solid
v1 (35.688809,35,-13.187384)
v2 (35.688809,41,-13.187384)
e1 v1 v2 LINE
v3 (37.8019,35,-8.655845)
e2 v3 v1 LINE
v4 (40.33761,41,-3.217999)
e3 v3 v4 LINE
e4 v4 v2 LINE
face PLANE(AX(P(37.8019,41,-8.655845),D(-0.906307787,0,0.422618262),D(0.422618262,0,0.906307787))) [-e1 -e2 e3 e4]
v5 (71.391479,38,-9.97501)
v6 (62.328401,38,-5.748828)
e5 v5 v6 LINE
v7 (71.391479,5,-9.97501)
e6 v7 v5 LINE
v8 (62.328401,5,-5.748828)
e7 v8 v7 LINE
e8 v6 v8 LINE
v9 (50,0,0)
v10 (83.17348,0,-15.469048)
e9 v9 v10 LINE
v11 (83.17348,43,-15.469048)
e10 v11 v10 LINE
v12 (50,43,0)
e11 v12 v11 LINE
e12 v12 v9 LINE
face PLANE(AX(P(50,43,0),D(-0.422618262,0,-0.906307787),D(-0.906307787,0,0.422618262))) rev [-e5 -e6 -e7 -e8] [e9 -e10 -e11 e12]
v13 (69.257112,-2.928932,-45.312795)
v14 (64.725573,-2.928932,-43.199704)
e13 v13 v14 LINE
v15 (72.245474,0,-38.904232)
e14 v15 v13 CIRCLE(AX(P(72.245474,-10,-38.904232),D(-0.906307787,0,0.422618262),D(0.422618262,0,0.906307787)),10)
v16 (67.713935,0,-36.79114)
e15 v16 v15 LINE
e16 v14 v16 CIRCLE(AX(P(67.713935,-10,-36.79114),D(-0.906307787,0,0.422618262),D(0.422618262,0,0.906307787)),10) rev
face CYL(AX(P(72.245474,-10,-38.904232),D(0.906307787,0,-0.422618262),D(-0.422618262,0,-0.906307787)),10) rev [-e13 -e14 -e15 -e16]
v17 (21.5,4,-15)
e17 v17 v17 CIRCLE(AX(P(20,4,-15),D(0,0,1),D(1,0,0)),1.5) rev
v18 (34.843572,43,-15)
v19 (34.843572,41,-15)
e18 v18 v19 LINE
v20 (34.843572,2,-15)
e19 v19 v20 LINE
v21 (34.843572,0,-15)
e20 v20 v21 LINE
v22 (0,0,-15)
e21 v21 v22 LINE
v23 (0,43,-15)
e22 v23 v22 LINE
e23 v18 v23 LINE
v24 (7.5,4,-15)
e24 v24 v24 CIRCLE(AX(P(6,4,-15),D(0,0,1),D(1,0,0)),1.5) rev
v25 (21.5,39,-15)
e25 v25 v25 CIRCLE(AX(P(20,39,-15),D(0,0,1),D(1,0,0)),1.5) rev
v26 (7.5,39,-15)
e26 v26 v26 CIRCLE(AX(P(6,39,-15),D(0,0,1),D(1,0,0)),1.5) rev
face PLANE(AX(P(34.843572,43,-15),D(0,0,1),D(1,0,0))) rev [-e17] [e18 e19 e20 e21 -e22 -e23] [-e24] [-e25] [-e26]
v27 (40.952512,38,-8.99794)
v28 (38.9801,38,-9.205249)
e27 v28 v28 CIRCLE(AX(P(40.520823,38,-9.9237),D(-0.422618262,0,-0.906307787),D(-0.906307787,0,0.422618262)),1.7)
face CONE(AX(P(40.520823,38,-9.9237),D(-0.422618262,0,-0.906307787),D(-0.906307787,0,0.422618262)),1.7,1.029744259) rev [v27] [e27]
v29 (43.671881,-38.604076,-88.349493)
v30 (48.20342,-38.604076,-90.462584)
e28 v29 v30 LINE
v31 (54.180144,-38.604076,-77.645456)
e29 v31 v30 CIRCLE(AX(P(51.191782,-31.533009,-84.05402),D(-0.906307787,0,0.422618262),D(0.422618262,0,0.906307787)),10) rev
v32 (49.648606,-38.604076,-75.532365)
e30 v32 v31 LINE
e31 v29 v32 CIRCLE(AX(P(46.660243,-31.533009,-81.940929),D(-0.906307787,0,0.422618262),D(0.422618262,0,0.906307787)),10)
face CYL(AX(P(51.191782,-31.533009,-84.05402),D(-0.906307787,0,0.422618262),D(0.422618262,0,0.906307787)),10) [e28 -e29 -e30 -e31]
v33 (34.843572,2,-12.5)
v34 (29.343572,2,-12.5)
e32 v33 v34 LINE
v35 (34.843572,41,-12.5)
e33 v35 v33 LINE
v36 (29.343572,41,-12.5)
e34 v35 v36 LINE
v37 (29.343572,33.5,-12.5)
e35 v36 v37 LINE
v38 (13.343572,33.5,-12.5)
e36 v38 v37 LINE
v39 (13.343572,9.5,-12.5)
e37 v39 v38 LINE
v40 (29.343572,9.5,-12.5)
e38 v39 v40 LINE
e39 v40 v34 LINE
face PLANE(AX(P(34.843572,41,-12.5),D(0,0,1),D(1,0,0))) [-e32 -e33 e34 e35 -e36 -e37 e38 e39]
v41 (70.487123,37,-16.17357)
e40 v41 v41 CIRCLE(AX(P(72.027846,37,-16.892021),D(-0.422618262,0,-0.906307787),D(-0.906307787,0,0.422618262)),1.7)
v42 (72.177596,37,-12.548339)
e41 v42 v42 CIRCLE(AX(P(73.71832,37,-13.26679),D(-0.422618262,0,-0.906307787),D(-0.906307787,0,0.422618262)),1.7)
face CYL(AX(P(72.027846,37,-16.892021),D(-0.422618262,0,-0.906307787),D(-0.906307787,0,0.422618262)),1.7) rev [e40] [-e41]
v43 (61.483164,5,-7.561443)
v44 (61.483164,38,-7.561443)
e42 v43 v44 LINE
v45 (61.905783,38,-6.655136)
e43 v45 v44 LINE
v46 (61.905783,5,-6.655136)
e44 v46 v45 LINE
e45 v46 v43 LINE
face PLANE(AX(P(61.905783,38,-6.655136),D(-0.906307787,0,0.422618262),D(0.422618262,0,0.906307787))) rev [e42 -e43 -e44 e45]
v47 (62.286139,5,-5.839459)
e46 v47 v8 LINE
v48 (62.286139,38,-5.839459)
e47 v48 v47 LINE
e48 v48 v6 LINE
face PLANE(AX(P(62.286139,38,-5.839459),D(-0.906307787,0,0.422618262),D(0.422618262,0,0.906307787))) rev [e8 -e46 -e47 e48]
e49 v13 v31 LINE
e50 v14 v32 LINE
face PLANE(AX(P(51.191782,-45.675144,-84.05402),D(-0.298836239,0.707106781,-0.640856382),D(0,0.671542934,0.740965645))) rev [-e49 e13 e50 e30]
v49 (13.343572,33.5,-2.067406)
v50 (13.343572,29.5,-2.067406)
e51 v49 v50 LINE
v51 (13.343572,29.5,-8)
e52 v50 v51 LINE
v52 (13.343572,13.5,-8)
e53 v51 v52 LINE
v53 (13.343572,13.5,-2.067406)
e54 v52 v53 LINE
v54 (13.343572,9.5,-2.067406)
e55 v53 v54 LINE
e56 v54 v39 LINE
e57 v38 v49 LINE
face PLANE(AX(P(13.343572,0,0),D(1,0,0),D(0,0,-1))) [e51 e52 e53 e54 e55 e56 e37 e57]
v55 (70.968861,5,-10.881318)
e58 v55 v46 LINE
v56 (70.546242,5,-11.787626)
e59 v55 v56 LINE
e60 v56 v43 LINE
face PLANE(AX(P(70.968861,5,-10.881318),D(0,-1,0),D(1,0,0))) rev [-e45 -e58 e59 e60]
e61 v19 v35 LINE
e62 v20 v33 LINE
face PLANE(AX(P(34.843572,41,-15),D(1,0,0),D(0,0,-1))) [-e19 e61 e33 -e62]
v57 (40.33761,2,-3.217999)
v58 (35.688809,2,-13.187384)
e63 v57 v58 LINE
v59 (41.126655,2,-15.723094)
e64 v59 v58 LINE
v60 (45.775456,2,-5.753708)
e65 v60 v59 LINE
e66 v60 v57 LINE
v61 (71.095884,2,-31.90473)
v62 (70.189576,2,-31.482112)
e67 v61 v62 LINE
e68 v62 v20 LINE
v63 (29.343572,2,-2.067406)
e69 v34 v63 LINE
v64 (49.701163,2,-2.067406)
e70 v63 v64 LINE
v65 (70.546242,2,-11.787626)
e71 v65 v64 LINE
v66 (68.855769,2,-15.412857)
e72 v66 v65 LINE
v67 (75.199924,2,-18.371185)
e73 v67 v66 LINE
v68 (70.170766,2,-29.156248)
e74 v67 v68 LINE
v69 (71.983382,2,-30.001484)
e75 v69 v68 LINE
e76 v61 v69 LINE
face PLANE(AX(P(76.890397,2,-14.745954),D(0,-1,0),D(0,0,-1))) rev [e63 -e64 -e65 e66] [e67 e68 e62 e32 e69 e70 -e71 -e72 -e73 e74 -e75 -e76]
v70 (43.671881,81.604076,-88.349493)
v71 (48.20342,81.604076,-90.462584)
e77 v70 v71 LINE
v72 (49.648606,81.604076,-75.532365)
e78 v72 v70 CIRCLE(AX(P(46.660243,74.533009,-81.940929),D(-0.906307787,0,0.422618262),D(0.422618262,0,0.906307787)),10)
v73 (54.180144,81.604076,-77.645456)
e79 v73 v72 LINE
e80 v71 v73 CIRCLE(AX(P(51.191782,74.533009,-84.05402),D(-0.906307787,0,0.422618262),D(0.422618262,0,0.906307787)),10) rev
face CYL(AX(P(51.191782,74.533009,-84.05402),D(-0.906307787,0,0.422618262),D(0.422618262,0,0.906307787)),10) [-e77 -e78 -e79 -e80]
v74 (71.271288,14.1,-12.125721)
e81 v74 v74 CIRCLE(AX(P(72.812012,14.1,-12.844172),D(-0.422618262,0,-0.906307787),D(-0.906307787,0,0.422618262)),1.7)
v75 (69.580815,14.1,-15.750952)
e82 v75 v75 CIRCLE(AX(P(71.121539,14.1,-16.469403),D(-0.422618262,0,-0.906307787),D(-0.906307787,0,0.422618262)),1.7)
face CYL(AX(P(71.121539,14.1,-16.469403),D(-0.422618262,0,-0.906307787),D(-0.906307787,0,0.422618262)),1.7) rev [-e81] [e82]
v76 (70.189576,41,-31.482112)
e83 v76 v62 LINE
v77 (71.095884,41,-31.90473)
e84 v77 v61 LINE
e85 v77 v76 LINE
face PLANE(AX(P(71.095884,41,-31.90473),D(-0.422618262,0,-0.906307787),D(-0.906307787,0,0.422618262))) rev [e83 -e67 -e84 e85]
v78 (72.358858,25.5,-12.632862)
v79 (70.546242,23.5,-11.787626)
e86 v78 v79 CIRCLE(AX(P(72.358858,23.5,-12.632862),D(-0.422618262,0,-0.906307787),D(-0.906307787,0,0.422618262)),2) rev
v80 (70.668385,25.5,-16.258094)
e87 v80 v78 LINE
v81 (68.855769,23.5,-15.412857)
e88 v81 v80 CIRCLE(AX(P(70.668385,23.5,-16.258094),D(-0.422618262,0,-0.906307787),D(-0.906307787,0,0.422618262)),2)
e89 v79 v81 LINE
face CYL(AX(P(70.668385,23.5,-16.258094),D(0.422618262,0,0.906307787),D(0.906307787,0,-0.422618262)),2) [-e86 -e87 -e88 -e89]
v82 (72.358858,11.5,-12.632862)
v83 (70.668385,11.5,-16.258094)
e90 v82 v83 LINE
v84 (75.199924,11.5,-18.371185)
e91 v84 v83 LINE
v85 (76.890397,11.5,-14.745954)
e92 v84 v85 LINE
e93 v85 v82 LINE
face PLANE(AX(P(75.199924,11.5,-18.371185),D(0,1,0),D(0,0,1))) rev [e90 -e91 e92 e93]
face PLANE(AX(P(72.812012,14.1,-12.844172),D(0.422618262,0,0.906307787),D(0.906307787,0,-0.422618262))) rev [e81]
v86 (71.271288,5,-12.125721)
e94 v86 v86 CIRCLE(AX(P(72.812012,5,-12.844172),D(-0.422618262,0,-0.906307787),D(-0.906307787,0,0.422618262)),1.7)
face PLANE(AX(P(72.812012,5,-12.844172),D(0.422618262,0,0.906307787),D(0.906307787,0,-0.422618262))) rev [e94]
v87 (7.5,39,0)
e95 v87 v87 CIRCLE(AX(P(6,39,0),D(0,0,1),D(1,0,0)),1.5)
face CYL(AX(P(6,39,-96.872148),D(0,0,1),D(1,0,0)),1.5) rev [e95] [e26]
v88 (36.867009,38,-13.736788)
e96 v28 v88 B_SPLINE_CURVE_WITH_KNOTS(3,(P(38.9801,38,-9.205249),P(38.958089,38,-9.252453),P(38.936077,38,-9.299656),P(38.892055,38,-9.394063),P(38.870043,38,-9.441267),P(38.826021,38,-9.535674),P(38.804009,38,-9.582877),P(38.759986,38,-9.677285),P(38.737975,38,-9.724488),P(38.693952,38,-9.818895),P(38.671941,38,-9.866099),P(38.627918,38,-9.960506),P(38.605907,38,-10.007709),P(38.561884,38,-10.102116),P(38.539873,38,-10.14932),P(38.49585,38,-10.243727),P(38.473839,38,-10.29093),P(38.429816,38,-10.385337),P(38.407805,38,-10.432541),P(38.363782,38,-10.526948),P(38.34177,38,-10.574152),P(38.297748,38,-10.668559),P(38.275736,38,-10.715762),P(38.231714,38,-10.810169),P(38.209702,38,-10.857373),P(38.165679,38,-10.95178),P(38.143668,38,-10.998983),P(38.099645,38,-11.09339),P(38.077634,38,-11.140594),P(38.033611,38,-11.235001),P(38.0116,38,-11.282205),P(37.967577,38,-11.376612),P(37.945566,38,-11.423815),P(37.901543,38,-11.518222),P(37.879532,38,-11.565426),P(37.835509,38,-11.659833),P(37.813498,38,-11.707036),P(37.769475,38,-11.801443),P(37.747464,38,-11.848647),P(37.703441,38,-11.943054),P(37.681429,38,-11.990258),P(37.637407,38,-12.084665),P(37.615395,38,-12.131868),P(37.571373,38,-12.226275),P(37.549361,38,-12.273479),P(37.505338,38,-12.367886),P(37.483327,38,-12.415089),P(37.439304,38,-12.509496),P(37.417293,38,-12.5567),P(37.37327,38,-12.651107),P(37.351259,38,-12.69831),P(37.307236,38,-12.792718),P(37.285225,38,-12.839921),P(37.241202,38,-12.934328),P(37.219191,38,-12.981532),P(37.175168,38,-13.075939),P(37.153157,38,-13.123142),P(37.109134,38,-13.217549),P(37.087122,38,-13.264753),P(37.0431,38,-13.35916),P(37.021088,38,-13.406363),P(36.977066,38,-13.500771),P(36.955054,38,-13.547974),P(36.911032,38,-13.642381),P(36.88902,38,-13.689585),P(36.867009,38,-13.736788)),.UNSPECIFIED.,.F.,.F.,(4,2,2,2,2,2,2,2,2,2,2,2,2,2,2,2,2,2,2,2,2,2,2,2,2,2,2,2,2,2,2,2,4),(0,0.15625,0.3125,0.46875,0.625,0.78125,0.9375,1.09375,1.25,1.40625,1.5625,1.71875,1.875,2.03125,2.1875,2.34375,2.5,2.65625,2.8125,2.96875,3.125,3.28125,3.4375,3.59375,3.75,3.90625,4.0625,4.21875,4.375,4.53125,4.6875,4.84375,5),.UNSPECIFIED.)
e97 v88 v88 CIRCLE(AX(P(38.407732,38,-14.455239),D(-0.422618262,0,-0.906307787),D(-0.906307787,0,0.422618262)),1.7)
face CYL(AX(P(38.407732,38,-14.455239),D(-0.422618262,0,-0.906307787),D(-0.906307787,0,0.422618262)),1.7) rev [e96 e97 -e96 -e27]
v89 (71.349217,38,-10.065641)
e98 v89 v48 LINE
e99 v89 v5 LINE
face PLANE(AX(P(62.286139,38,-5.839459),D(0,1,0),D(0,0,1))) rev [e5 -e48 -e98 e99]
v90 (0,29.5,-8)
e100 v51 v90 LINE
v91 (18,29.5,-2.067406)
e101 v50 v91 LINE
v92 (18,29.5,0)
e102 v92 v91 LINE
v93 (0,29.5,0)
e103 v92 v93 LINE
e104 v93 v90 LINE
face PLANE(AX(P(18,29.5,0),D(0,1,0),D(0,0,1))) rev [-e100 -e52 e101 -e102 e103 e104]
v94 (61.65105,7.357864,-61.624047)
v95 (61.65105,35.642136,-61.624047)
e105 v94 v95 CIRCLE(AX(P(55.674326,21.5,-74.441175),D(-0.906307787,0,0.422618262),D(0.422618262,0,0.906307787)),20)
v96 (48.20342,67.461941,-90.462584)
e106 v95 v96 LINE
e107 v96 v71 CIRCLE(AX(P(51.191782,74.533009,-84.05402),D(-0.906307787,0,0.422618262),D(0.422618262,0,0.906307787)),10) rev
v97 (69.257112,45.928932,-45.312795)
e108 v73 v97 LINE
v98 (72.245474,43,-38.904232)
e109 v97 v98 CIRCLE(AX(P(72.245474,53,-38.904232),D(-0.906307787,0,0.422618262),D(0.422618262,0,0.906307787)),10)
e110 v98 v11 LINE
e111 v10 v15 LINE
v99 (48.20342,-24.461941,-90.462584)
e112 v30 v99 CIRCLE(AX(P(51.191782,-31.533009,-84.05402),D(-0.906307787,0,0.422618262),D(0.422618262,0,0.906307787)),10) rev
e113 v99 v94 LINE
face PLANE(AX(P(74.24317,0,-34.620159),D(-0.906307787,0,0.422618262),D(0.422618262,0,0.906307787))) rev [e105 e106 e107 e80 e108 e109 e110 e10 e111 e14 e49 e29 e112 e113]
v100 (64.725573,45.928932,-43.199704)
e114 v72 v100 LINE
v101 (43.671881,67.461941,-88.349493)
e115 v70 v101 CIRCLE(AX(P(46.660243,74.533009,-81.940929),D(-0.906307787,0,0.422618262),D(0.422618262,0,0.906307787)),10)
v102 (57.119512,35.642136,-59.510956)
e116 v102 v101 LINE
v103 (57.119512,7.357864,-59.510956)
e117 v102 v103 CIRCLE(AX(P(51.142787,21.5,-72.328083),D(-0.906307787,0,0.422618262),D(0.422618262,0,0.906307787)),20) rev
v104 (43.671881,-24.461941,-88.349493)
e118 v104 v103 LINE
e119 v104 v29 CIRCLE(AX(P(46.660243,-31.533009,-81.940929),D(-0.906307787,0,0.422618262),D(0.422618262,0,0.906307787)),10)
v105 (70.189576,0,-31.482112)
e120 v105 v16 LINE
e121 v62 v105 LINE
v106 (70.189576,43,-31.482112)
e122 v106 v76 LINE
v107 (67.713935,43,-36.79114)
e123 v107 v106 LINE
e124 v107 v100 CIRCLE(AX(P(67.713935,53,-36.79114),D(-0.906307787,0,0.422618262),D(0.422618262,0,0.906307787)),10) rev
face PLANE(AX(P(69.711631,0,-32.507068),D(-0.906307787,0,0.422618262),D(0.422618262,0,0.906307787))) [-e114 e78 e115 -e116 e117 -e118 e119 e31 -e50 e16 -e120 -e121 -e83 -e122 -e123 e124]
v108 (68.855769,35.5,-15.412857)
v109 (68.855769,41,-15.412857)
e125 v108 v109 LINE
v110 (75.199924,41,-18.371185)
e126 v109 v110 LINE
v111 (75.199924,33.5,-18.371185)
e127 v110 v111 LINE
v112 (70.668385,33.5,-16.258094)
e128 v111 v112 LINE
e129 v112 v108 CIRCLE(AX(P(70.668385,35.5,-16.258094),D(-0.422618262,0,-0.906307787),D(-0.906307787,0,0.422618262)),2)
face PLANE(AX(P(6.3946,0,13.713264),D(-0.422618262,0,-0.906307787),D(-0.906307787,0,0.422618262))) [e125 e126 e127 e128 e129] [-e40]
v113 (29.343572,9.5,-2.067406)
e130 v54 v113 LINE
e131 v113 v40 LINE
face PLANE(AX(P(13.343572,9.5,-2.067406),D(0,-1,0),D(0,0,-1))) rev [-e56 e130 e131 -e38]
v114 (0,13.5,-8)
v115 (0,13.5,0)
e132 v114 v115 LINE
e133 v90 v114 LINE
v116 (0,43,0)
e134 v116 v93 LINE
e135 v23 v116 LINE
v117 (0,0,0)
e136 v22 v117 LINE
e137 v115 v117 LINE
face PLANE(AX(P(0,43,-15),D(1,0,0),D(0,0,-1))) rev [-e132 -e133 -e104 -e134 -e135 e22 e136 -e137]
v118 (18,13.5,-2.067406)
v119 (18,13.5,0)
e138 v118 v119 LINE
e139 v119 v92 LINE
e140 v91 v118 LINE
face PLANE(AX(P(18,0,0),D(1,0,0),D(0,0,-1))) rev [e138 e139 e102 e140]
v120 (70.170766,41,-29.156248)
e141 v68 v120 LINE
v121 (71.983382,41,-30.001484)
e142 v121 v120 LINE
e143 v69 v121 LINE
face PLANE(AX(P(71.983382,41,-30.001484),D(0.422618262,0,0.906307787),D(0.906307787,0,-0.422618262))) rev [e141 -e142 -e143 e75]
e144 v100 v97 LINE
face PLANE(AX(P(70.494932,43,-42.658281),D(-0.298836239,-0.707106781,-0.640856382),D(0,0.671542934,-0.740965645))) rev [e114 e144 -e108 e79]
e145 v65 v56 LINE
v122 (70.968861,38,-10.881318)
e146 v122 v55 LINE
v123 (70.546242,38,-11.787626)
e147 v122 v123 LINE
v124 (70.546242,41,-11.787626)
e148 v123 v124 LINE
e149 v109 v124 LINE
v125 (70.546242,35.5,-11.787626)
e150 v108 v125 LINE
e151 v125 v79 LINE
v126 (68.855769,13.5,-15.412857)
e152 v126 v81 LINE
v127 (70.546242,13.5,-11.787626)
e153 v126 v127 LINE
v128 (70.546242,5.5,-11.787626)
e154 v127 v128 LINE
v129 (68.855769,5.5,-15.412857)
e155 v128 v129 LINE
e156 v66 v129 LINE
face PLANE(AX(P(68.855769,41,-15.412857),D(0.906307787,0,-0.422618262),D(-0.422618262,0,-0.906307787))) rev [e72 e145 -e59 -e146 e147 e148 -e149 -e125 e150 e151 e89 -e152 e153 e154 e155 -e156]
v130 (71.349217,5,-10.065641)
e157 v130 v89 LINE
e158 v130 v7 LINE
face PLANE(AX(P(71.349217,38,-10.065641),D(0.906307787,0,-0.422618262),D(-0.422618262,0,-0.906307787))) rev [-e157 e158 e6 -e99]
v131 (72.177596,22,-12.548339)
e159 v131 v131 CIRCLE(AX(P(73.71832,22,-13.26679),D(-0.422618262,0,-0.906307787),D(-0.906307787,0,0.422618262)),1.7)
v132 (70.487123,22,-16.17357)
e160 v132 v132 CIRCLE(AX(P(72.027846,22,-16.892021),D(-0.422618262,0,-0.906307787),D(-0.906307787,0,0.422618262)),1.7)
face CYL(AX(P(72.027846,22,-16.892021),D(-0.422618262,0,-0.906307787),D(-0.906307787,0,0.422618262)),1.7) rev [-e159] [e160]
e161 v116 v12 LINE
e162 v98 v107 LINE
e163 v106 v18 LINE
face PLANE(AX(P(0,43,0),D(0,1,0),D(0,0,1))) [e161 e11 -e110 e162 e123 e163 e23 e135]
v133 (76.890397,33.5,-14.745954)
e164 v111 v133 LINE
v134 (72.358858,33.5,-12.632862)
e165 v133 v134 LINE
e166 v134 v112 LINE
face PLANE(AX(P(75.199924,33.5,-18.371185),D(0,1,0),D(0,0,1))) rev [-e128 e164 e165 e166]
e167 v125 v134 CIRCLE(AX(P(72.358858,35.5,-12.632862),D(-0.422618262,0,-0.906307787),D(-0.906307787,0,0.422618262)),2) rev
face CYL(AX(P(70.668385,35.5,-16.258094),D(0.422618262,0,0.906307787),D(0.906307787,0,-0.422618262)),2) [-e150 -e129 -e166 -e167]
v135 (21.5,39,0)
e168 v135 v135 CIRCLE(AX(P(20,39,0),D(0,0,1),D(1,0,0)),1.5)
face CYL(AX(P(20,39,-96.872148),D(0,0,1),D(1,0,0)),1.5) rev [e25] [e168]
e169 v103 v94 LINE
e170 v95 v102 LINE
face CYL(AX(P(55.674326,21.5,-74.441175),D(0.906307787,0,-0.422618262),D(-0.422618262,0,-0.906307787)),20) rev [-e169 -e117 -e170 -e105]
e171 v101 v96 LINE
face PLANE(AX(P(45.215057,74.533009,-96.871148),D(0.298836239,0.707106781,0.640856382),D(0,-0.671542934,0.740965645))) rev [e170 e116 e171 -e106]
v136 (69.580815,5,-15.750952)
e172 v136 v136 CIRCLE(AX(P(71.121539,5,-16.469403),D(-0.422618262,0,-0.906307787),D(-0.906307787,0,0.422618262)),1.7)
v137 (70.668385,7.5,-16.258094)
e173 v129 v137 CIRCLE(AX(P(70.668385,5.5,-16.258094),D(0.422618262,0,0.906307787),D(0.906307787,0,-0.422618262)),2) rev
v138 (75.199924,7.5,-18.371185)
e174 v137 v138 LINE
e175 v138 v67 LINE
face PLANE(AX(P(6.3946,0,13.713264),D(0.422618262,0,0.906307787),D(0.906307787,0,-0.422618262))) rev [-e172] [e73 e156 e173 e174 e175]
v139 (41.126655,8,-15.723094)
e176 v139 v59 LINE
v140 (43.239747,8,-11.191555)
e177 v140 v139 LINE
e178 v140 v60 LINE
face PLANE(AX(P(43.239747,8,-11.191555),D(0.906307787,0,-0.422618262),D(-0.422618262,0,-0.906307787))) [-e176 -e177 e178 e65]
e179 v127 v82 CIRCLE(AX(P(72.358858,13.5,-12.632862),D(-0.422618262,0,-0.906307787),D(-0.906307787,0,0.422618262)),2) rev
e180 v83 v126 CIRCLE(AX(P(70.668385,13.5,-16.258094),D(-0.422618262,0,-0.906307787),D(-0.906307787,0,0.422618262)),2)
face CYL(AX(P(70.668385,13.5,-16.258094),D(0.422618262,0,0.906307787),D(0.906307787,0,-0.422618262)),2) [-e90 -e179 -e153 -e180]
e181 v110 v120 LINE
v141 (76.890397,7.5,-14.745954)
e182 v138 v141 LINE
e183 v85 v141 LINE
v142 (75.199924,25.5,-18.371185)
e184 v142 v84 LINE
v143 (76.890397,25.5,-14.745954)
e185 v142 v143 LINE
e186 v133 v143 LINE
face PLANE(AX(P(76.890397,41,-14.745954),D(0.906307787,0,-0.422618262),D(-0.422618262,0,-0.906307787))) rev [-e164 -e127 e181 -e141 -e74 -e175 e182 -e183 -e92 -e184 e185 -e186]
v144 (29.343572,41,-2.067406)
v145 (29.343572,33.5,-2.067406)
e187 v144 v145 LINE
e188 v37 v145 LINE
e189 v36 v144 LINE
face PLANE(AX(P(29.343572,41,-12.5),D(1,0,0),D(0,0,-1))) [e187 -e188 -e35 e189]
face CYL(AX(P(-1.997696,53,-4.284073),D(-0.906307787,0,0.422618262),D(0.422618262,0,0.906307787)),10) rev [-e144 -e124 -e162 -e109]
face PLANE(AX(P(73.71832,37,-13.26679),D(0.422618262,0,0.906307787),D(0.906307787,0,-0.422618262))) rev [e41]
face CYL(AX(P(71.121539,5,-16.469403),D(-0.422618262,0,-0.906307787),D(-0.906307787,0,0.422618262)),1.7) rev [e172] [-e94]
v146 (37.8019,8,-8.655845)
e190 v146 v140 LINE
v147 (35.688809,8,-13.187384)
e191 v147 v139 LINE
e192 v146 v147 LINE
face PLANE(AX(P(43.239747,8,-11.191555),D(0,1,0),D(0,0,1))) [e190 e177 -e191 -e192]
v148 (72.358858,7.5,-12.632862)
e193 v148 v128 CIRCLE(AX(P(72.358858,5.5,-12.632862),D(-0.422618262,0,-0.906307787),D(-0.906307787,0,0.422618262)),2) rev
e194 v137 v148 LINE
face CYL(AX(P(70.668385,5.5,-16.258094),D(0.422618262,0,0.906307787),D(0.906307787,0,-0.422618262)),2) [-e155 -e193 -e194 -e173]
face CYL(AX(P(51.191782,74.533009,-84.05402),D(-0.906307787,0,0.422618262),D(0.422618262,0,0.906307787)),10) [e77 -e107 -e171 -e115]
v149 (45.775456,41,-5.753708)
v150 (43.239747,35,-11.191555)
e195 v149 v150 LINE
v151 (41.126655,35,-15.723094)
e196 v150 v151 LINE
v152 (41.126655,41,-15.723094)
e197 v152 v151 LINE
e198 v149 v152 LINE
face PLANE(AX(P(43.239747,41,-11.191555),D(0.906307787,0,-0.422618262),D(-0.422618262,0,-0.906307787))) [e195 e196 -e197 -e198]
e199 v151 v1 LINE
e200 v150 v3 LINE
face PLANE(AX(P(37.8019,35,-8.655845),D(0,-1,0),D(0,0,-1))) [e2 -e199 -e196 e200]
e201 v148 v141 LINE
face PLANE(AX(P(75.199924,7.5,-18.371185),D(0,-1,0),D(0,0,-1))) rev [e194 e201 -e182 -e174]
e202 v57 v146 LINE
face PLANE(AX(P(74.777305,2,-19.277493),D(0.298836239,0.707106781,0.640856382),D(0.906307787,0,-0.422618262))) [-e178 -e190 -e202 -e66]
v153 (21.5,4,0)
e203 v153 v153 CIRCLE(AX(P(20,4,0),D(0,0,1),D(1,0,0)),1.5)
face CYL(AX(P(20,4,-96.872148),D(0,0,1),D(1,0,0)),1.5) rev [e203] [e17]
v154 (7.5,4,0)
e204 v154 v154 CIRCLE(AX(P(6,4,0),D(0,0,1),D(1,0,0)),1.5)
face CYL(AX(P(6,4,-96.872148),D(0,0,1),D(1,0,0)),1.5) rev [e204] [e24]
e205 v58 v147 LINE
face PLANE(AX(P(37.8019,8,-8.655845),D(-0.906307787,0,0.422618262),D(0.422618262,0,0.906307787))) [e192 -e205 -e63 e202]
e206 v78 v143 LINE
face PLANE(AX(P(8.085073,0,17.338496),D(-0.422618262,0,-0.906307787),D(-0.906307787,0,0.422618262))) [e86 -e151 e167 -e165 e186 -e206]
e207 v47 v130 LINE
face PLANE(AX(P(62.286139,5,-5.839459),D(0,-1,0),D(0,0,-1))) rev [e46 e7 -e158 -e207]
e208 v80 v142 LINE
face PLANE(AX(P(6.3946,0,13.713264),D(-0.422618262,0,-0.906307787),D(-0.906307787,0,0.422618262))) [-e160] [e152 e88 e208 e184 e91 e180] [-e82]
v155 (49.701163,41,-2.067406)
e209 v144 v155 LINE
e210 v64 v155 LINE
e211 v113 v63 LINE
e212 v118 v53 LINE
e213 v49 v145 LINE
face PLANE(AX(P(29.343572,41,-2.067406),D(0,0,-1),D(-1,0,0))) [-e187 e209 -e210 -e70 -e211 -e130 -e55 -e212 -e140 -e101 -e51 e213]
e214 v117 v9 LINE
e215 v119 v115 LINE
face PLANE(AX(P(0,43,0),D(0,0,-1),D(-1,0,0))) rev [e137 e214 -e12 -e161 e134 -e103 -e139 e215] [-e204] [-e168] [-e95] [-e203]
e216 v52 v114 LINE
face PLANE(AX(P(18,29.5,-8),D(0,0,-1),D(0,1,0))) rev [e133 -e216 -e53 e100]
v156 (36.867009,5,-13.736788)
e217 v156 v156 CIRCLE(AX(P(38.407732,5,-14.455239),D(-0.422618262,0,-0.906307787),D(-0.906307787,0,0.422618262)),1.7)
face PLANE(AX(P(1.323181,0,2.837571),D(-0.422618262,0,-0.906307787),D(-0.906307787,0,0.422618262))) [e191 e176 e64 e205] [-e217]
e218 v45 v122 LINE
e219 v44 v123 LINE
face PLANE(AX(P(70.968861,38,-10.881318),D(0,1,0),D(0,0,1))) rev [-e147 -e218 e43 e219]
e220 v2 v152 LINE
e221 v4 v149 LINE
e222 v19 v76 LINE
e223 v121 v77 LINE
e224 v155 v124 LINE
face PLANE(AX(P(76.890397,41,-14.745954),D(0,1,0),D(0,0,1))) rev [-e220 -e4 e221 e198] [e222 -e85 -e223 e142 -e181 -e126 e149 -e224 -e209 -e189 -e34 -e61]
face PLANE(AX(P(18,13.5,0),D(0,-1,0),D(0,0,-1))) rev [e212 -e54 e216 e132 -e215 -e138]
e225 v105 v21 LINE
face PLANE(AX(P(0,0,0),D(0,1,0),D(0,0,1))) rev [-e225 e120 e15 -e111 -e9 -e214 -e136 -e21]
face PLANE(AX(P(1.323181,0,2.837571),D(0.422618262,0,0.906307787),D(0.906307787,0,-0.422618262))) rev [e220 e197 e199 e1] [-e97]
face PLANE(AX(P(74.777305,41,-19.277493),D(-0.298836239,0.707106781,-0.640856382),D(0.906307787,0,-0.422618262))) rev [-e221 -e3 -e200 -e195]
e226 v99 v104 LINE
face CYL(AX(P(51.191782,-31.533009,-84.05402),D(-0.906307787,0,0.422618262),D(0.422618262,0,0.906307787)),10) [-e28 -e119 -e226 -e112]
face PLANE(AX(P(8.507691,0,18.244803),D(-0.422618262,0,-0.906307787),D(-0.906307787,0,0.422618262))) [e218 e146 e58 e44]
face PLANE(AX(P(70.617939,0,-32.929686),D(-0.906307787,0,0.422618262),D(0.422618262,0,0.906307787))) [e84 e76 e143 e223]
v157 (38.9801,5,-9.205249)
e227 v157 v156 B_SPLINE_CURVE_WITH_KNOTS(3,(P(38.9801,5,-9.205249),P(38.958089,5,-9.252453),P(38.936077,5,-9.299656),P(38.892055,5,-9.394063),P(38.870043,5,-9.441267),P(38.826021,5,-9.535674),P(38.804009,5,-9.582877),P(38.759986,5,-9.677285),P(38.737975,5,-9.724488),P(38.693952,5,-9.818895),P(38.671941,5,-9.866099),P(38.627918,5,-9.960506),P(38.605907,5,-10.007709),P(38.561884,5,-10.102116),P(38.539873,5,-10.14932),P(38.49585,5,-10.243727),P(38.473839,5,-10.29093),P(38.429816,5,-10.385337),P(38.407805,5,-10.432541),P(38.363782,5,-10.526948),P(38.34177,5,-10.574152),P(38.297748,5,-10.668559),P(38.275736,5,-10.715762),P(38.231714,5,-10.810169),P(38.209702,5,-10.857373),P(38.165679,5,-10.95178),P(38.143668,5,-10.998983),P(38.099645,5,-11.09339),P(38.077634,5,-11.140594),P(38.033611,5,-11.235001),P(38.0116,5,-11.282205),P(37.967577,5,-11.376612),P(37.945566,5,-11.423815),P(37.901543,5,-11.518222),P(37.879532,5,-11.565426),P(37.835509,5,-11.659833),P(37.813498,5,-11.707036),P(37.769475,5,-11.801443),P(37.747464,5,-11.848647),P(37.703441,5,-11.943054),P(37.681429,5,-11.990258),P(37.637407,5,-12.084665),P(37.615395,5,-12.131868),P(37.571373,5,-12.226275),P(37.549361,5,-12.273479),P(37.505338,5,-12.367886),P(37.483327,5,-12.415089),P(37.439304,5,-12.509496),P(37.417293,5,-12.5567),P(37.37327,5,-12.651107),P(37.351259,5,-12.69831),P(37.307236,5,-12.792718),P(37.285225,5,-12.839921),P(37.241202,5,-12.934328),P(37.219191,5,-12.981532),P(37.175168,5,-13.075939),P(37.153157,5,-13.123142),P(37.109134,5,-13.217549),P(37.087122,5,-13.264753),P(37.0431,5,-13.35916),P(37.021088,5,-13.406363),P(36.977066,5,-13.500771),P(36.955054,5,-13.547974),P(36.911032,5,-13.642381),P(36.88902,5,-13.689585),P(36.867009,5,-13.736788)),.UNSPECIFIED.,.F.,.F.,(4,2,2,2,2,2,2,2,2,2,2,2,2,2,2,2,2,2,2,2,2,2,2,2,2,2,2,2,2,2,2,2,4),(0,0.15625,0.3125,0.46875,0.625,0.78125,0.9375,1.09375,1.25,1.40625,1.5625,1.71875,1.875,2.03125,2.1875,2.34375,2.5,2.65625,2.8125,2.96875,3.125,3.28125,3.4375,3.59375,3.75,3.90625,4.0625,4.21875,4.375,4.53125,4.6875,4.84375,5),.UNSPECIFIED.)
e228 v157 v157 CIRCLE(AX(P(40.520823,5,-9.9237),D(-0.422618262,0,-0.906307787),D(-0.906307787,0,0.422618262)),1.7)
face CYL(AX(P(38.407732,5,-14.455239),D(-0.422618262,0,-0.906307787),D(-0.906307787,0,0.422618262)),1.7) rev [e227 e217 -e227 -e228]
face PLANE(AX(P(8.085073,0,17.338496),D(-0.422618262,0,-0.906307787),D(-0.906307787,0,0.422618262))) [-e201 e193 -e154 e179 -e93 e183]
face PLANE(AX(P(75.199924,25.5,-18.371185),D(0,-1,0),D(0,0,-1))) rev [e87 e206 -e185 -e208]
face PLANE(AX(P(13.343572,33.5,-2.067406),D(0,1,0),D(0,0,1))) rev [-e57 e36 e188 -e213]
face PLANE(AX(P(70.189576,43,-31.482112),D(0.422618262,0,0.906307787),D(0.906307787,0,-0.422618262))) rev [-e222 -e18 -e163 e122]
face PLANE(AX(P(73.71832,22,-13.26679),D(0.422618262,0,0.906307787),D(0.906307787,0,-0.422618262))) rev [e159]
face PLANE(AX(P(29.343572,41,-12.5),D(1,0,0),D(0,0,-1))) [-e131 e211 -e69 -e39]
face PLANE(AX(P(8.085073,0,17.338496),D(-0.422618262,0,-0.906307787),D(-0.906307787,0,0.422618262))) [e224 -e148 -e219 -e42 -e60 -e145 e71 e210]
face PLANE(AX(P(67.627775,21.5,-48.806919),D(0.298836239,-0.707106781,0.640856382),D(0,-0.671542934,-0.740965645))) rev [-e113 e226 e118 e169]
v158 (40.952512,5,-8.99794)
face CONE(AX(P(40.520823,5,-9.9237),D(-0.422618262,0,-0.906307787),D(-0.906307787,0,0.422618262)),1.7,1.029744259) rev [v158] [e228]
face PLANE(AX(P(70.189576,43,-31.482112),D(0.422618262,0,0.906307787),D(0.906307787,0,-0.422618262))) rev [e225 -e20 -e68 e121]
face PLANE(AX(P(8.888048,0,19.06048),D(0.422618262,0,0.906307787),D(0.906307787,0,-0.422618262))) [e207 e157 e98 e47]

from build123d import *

# Parameters (mm, degrees)
AUFSATZ_LINEAR_AUSTRAGEN1_DEPTH      = 43
AUFSATZ_LINEAR_AUSTRAGEN2_DEPTH      = 5
SCHNITT_LINEAR_AUSTRAGEN1_REACH      = 157.451
SKIZZE3_R                            = 1.5
SKIZZE4_W                            = 8
SKIZZE4_H                            = 16
SCHNITT_LINEAR_AUSTRAGEN2_DEPTH      = 18
SKIZZE5_W                            = 30
SKIZZE5_H                            = 39
SCHNITT_LINEAR_AUSTRAGEN3_DEPTH      = 18
SKIZZE6_W                            = 7
SKIZZE6_H                            = 7.5
SKIZZE6_H_2                          = 14
SKIZZE6_H_3                          = 5.5
AUFSATZ_LINEAR_AUSTRAGEN3_DEPTH      = 4
VERRUNDUNG1_R                        = 2
F_3_4_3_4_DURCHMESSER_BOHRUNG1_D     = 3.4
F_3_4_3_4_DURCHMESSER_BOHRUNG1_DEPTH = 4
SKIZZE10_W                           = 10
SKIZZE10_H                           = 33
SCHNITT_LINEAR_AUSTRAGEN4_DEPTH      = 1
SKIZZE11_W                           = 10
SKIZZE11_H                           = 33
SCHNITT_LINEAR_AUSTRAGEN5_DEPTH      = 0.1
SCHNITT_LINEAR_AUSTRAGEN7_DEPTH      = 39
SKIZZE15_W                           = 10.432594073
SKIZZE15_H                           = 24
SCHNITT_LINEAR_AUSTRAGEN10_DEPTH     = 16
SKIZZE16_W                           = 2.1
SKIZZE16_H                           = 39
SCHNITT_LINEAR_AUSTRAGEN11_DEPTH     = 2
VERRUNDUNG2_R                        = 20
VERRUNDUNG3_R                        = 10
SKIZZE17_W                           = 6
SKIZZE17_H                           = 6
AUFSATZ_LINEAR_AUSTRAGEN4_DEPTH      = 5
FASE1_SIZE                           = 6
F_3_4_3_4_DURCHMESSER_BOHRUNG2_D     = 3.4
F_3_4_3_4_DURCHMESSER_BOHRUNG2_DEPTH = 5
F_3_4_3_4_DURCHMESSER_BOHRUNG2_TIP   = 1.021463052


with BuildPart() as part:
    # Skizze1 → Aufsatz-Linear austragen1 (new body)
    with BuildSketch(Plane(origin=(0, 0, 0), x_dir=(1, 0, 0), z_dir=(0, 1, 0))):
        Polygon((0, 0), (50, 0), (78.641941074, 13.355956467), (70.189575839, 31.482112208), (34.843572145, 15), (0, 15), align=None)
    extrude(amount=AUFSATZ_LINEAR_AUSTRAGEN1_DEPTH)

    # Skizze2 → Aufsatz-Linear austragen2 (add)
    with BuildSketch(Plane(origin=(69.711631316, 0, -32.507067545), x_dir=(-0.4226182617407004, 0, -0.9063077870366495), z_dir=(0.9063077870366495, 0, -0.4226182617407004))):
        Polygon((-21.130913087, 43), (8.869086913, 43), (54.544231126, 88.675144213), (68.686366749, 74.533008589), (15.65335816, 21.5), (68.686366749, -31.533008589), (54.544231126, -45.675144213), (8.869086913, 0), (-21.130913087, 0), align=None)
    extrude(amount=AUFSATZ_LINEAR_AUSTRAGEN2_DEPTH)

    # Skizze3 → Schnitt-Linear austragen1 (cut, up to next)
    with BuildSketch(Plane.XY, mode=Mode.PRIVATE) as schnitt_linear_austragen1_sk1:
        with Locations((6, 39)):
            Circle(SKIZZE3_R)
    schnitt_linear_austragen1_tool1 = extrude(schnitt_linear_austragen1_sk1.sketch, amount=-SCHNITT_LINEAR_AUSTRAGEN1_REACH, mode=Mode.PRIVATE) & part.part
    # Skizze3 → Schnitt-Linear austragen1 (cut, up to next)
    with BuildSketch(Plane.XY, mode=Mode.PRIVATE) as schnitt_linear_austragen1_sk2:
        with Locations((20, 39)):
            Circle(SKIZZE3_R)
    schnitt_linear_austragen1_tool2 = extrude(schnitt_linear_austragen1_sk2.sketch, amount=-SCHNITT_LINEAR_AUSTRAGEN1_REACH, mode=Mode.PRIVATE) & part.part
    # Skizze3 → Schnitt-Linear austragen1 (cut, up to next)
    with BuildSketch(Plane.XY, mode=Mode.PRIVATE) as schnitt_linear_austragen1_sk3:
        with Locations((6, 4)):
            Circle(SKIZZE3_R)
    schnitt_linear_austragen1_tool3 = extrude(schnitt_linear_austragen1_sk3.sketch, amount=-SCHNITT_LINEAR_AUSTRAGEN1_REACH, mode=Mode.PRIVATE) & part.part
    # Skizze3 → Schnitt-Linear austragen1 (cut, up to next)
    with BuildSketch(Plane.XY, mode=Mode.PRIVATE) as schnitt_linear_austragen1_sk4:
        with Locations((20, 4)):
            Circle(SKIZZE3_R)
    schnitt_linear_austragen1_tool4 = extrude(schnitt_linear_austragen1_sk4.sketch, amount=-SCHNITT_LINEAR_AUSTRAGEN1_REACH, mode=Mode.PRIVATE) & part.part
    add(schnitt_linear_austragen1_tool1.solids().sort_by_distance((6, 39, 0))[0], mode=Mode.SUBTRACT)
    add(schnitt_linear_austragen1_tool2.solids().sort_by_distance((20, 39, 0))[0], mode=Mode.SUBTRACT)
    add(schnitt_linear_austragen1_tool3.solids().sort_by_distance((6, 4, 0))[0], mode=Mode.SUBTRACT)
    add(schnitt_linear_austragen1_tool4.solids().sort_by_distance((20, 4, 0))[0], mode=Mode.SUBTRACT)

    # Skizze4 → Schnitt-Linear austragen2 (cut)
    with BuildSketch(Plane.ZY):
        with Locations((-4, 21.5)):
            Rectangle(SKIZZE4_W, SKIZZE4_H)
    extrude(amount=-SCHNITT_LINEAR_AUSTRAGEN2_DEPTH, mode=Mode.SUBTRACT)

    # Skizze5 → Schnitt-Linear austragen3 (cut)
    with BuildSketch(Plane(origin=(0.477944523, 0, 1.024955337), x_dir=(-0.9063077870366492, 0, 0.4226182617407011), z_dir=(-0.4226182617407011, 0, -0.9063077870366492))):
        with Locations((-60.918274689, 21.5)):
            Rectangle(SKIZZE5_W, SKIZZE5_H)
    extrude(amount=-SCHNITT_LINEAR_AUSTRAGEN3_DEPTH, mode=Mode.SUBTRACT)

    # Skizze6 → Aufsatz-Linear austragen3 (add)
    with BuildSketch(Plane(origin=(8.085073234, 0, 17.338495504), x_dir=(-0.9063077870366492, 0, 0.42261826174070133), z_dir=(-0.42261826174070133, 0, -0.9063077870366492))):
        with Locations((-72.418274689, 37.25)):
            Rectangle(SKIZZE6_W, SKIZZE6_H)
        with Locations((-72.418274689, 18.5)):
            Rectangle(SKIZZE6_W, SKIZZE6_H_2)
        with Locations((-72.418274689, 4.75)):
            Rectangle(SKIZZE6_W, SKIZZE6_H_3)
    extrude(amount=AUFSATZ_LINEAR_AUSTRAGEN3_DEPTH)

    # Verrundung1
    verrundung1_edges = [part.edges().sort_by_distance(p)[0] for p in [
        (69.701005731, 33.5, -13.600241521),
        (69.701005731, 11.5, -13.600241521),
        (69.701005731, 25.5, -13.600241521),
        (69.701005731, 7.5, -13.600241521),
    ]]
    fillet(verrundung1_edges, radius=VERRUNDUNG1_R)

    # Ø3.4 (3.4) Durchmesser Bohrung1
    with Locations(Plane(origin=(6.394600187, 0, 13.713264356), x_dir=(-0.906307787036649, 0, 0.4226182617407016), z_dir=(-0.4226182617407016, 0, -0.906307787036649))):
        with Locations((-72.418274689, 37), (-72.418274689, 22), (-71.418274689, 14.1), (-71.418274689, 5)):
            Hole(F_3_4_3_4_DURCHMESSER_BOHRUNG1_D / 2, depth=F_3_4_3_4_DURCHMESSER_BOHRUNG1_DEPTH)

    # Skizze10 → Schnitt-Linear austragen4 (cut)
    with BuildSketch(Plane(origin=(8.085073234, 0, 17.338495504), x_dir=(-0.9063077870366492, 0, 0.42261826174070133), z_dir=(-0.42261826174070133, 0, -0.9063077870366492))):
        with Locations((-63.918274689, 21.5)):
            Rectangle(SKIZZE10_W, SKIZZE10_H)
    extrude(amount=-SCHNITT_LINEAR_AUSTRAGEN4_DEPTH, mode=Mode.SUBTRACT)

    # Skizze11 → Schnitt-Linear austragen5 (cut)
    with BuildSketch(Plane(origin=(8.930309758, 0, 19.151111078), x_dir=(0.9063077870366492, 0, -0.42261826174070133), z_dir=(0.42261826174070133, 0, 0.9063077870366492))):
        with Locations((63.918274689, 21.5)):
            Rectangle(SKIZZE11_W, SKIZZE11_H)
    extrude(amount=-SCHNITT_LINEAR_AUSTRAGEN5_DEPTH, mode=Mode.SUBTRACT)

    # Skizze12 → Schnitt-Linear austragen7 (cut)
    with BuildSketch(Plane(origin=(0, 2, 0), x_dir=(1, 0, 0), z_dir=(0, 1, 0))):
        Polygon((49.701163152, 2.067405927), (42.094034441, 18.380946094), (34.843572145, 15), (34.843572145, 12.5), (29.343572145, 12.5), (29.343572145, 2.067405927), align=None)
    extrude(amount=SCHNITT_LINEAR_AUSTRAGEN7_DEPTH, mode=Mode.SUBTRACT)

    # Skizze15 → Schnitt-Linear austragen10 (cut)
    with BuildSketch(Plane(origin=(29.343572145, 0, 0), x_dir=(0, 0, -1), z_dir=(1, 0, 0))):
        with Locations((7.283702963, 21.5)):
            Rectangle(SKIZZE15_W, SKIZZE15_H)
    extrude(amount=-SCHNITT_LINEAR_AUSTRAGEN10_DEPTH, mode=Mode.SUBTRACT)

    # Skizze16 → Schnitt-Linear austragen11 (cut)
    with BuildSketch(Plane(origin=(68.805323529, 0, -32.084449283), x_dir=(0.42261826174070133, 0, 0.9063077870366492), z_dir=(-0.9063077870366492, 0, 0.42261826174070133))):
        with Locations((2.180913087, 21.5)):
            Rectangle(SKIZZE16_W, SKIZZE16_H)
    extrude(amount=-SCHNITT_LINEAR_AUSTRAGEN11_DEPTH, mode=Mode.SUBTRACT)

    # Verrundung2
    verrundung2_edges = [part.edges().sort_by_distance(p)[0] for p in [
        (65.362005767, 21.5, -47.750373594),
    ]]
    fillet(verrundung2_edges, radius=VERRUNDUNG2_R)

    # Verrundung3
    verrundung3_edges = [part.edges().sort_by_distance(p)[0] for p in [
        (68.229162689, 43, -41.601735733),
        (68.229162689, 0, -41.601735733),
        (42.949287863, 74.533008589, -95.814602248),
        (48.926012637, 88.675144213, -82.997474607),
        (48.926012637, -45.675144213, -82.997474607),
        (42.949287863, -31.533008589, -95.814602248),
    ]]
    fillet(verrundung3_edges, radius=VERRUNDUNG3_R - 0.0001)  # a hair under: the kernel refuses the full size

    # Skizze17 → Aufsatz-Linear austragen4 (add)
    with BuildSketch(Plane(origin=(1.323181047, 0, 2.837570911), x_dir=(-0.9063077870366492, 0, 0.4226182617407011), z_dir=(-0.4226182617407011, 0, -0.9063077870366492))):
        with Locations((-40.918274689, 38)):
            Rectangle(SKIZZE17_W, SKIZZE17_H)
        with Locations((-40.918274689, 5)):
            Rectangle(SKIZZE17_W, SKIZZE17_H)
    extrude(amount=-AUFSATZ_LINEAR_AUSTRAGEN4_DEPTH)

    # Fase1
    fase1_edges = [part.edges().sort_by_distance(p)[0] for p in [
        (40.520823338, 2, -9.923700276),
        (40.520823338, 41, -9.923700276),
    ]]
    chamfer(fase1_edges, length=FASE1_SIZE - 0.0001)  # a hair under: the kernel refuses the full size

    # Ø3.4 (3.4) Durchmesser Bohrung2
    with Locations(Plane(origin=(1.323181047, 0, 2.837570911), x_dir=(-0.9063077870366492, 0, 0.4226182617407014), z_dir=(-0.42261826174070133, 0, -0.906307787036649))):
        with Locations((-40.918274689, 38), (-40.918274689, 5)):
            Hole(F_3_4_3_4_DURCHMESSER_BOHRUNG2_D / 2, depth=F_3_4_3_4_DURCHMESSER_BOHRUNG2_DEPTH)
            with Locations((0, 0, -(F_3_4_3_4_DURCHMESSER_BOHRUNG2_DEPTH + F_3_4_3_4_DURCHMESSER_BOHRUNG2_TIP / 2))):  # 118° drill point
                Cone(0, F_3_4_3_4_DURCHMESSER_BOHRUNG2_D / 2, F_3_4_3_4_DURCHMESSER_BOHRUNG2_TIP, mode=Mode.SUBTRACT)


solid = part.part
